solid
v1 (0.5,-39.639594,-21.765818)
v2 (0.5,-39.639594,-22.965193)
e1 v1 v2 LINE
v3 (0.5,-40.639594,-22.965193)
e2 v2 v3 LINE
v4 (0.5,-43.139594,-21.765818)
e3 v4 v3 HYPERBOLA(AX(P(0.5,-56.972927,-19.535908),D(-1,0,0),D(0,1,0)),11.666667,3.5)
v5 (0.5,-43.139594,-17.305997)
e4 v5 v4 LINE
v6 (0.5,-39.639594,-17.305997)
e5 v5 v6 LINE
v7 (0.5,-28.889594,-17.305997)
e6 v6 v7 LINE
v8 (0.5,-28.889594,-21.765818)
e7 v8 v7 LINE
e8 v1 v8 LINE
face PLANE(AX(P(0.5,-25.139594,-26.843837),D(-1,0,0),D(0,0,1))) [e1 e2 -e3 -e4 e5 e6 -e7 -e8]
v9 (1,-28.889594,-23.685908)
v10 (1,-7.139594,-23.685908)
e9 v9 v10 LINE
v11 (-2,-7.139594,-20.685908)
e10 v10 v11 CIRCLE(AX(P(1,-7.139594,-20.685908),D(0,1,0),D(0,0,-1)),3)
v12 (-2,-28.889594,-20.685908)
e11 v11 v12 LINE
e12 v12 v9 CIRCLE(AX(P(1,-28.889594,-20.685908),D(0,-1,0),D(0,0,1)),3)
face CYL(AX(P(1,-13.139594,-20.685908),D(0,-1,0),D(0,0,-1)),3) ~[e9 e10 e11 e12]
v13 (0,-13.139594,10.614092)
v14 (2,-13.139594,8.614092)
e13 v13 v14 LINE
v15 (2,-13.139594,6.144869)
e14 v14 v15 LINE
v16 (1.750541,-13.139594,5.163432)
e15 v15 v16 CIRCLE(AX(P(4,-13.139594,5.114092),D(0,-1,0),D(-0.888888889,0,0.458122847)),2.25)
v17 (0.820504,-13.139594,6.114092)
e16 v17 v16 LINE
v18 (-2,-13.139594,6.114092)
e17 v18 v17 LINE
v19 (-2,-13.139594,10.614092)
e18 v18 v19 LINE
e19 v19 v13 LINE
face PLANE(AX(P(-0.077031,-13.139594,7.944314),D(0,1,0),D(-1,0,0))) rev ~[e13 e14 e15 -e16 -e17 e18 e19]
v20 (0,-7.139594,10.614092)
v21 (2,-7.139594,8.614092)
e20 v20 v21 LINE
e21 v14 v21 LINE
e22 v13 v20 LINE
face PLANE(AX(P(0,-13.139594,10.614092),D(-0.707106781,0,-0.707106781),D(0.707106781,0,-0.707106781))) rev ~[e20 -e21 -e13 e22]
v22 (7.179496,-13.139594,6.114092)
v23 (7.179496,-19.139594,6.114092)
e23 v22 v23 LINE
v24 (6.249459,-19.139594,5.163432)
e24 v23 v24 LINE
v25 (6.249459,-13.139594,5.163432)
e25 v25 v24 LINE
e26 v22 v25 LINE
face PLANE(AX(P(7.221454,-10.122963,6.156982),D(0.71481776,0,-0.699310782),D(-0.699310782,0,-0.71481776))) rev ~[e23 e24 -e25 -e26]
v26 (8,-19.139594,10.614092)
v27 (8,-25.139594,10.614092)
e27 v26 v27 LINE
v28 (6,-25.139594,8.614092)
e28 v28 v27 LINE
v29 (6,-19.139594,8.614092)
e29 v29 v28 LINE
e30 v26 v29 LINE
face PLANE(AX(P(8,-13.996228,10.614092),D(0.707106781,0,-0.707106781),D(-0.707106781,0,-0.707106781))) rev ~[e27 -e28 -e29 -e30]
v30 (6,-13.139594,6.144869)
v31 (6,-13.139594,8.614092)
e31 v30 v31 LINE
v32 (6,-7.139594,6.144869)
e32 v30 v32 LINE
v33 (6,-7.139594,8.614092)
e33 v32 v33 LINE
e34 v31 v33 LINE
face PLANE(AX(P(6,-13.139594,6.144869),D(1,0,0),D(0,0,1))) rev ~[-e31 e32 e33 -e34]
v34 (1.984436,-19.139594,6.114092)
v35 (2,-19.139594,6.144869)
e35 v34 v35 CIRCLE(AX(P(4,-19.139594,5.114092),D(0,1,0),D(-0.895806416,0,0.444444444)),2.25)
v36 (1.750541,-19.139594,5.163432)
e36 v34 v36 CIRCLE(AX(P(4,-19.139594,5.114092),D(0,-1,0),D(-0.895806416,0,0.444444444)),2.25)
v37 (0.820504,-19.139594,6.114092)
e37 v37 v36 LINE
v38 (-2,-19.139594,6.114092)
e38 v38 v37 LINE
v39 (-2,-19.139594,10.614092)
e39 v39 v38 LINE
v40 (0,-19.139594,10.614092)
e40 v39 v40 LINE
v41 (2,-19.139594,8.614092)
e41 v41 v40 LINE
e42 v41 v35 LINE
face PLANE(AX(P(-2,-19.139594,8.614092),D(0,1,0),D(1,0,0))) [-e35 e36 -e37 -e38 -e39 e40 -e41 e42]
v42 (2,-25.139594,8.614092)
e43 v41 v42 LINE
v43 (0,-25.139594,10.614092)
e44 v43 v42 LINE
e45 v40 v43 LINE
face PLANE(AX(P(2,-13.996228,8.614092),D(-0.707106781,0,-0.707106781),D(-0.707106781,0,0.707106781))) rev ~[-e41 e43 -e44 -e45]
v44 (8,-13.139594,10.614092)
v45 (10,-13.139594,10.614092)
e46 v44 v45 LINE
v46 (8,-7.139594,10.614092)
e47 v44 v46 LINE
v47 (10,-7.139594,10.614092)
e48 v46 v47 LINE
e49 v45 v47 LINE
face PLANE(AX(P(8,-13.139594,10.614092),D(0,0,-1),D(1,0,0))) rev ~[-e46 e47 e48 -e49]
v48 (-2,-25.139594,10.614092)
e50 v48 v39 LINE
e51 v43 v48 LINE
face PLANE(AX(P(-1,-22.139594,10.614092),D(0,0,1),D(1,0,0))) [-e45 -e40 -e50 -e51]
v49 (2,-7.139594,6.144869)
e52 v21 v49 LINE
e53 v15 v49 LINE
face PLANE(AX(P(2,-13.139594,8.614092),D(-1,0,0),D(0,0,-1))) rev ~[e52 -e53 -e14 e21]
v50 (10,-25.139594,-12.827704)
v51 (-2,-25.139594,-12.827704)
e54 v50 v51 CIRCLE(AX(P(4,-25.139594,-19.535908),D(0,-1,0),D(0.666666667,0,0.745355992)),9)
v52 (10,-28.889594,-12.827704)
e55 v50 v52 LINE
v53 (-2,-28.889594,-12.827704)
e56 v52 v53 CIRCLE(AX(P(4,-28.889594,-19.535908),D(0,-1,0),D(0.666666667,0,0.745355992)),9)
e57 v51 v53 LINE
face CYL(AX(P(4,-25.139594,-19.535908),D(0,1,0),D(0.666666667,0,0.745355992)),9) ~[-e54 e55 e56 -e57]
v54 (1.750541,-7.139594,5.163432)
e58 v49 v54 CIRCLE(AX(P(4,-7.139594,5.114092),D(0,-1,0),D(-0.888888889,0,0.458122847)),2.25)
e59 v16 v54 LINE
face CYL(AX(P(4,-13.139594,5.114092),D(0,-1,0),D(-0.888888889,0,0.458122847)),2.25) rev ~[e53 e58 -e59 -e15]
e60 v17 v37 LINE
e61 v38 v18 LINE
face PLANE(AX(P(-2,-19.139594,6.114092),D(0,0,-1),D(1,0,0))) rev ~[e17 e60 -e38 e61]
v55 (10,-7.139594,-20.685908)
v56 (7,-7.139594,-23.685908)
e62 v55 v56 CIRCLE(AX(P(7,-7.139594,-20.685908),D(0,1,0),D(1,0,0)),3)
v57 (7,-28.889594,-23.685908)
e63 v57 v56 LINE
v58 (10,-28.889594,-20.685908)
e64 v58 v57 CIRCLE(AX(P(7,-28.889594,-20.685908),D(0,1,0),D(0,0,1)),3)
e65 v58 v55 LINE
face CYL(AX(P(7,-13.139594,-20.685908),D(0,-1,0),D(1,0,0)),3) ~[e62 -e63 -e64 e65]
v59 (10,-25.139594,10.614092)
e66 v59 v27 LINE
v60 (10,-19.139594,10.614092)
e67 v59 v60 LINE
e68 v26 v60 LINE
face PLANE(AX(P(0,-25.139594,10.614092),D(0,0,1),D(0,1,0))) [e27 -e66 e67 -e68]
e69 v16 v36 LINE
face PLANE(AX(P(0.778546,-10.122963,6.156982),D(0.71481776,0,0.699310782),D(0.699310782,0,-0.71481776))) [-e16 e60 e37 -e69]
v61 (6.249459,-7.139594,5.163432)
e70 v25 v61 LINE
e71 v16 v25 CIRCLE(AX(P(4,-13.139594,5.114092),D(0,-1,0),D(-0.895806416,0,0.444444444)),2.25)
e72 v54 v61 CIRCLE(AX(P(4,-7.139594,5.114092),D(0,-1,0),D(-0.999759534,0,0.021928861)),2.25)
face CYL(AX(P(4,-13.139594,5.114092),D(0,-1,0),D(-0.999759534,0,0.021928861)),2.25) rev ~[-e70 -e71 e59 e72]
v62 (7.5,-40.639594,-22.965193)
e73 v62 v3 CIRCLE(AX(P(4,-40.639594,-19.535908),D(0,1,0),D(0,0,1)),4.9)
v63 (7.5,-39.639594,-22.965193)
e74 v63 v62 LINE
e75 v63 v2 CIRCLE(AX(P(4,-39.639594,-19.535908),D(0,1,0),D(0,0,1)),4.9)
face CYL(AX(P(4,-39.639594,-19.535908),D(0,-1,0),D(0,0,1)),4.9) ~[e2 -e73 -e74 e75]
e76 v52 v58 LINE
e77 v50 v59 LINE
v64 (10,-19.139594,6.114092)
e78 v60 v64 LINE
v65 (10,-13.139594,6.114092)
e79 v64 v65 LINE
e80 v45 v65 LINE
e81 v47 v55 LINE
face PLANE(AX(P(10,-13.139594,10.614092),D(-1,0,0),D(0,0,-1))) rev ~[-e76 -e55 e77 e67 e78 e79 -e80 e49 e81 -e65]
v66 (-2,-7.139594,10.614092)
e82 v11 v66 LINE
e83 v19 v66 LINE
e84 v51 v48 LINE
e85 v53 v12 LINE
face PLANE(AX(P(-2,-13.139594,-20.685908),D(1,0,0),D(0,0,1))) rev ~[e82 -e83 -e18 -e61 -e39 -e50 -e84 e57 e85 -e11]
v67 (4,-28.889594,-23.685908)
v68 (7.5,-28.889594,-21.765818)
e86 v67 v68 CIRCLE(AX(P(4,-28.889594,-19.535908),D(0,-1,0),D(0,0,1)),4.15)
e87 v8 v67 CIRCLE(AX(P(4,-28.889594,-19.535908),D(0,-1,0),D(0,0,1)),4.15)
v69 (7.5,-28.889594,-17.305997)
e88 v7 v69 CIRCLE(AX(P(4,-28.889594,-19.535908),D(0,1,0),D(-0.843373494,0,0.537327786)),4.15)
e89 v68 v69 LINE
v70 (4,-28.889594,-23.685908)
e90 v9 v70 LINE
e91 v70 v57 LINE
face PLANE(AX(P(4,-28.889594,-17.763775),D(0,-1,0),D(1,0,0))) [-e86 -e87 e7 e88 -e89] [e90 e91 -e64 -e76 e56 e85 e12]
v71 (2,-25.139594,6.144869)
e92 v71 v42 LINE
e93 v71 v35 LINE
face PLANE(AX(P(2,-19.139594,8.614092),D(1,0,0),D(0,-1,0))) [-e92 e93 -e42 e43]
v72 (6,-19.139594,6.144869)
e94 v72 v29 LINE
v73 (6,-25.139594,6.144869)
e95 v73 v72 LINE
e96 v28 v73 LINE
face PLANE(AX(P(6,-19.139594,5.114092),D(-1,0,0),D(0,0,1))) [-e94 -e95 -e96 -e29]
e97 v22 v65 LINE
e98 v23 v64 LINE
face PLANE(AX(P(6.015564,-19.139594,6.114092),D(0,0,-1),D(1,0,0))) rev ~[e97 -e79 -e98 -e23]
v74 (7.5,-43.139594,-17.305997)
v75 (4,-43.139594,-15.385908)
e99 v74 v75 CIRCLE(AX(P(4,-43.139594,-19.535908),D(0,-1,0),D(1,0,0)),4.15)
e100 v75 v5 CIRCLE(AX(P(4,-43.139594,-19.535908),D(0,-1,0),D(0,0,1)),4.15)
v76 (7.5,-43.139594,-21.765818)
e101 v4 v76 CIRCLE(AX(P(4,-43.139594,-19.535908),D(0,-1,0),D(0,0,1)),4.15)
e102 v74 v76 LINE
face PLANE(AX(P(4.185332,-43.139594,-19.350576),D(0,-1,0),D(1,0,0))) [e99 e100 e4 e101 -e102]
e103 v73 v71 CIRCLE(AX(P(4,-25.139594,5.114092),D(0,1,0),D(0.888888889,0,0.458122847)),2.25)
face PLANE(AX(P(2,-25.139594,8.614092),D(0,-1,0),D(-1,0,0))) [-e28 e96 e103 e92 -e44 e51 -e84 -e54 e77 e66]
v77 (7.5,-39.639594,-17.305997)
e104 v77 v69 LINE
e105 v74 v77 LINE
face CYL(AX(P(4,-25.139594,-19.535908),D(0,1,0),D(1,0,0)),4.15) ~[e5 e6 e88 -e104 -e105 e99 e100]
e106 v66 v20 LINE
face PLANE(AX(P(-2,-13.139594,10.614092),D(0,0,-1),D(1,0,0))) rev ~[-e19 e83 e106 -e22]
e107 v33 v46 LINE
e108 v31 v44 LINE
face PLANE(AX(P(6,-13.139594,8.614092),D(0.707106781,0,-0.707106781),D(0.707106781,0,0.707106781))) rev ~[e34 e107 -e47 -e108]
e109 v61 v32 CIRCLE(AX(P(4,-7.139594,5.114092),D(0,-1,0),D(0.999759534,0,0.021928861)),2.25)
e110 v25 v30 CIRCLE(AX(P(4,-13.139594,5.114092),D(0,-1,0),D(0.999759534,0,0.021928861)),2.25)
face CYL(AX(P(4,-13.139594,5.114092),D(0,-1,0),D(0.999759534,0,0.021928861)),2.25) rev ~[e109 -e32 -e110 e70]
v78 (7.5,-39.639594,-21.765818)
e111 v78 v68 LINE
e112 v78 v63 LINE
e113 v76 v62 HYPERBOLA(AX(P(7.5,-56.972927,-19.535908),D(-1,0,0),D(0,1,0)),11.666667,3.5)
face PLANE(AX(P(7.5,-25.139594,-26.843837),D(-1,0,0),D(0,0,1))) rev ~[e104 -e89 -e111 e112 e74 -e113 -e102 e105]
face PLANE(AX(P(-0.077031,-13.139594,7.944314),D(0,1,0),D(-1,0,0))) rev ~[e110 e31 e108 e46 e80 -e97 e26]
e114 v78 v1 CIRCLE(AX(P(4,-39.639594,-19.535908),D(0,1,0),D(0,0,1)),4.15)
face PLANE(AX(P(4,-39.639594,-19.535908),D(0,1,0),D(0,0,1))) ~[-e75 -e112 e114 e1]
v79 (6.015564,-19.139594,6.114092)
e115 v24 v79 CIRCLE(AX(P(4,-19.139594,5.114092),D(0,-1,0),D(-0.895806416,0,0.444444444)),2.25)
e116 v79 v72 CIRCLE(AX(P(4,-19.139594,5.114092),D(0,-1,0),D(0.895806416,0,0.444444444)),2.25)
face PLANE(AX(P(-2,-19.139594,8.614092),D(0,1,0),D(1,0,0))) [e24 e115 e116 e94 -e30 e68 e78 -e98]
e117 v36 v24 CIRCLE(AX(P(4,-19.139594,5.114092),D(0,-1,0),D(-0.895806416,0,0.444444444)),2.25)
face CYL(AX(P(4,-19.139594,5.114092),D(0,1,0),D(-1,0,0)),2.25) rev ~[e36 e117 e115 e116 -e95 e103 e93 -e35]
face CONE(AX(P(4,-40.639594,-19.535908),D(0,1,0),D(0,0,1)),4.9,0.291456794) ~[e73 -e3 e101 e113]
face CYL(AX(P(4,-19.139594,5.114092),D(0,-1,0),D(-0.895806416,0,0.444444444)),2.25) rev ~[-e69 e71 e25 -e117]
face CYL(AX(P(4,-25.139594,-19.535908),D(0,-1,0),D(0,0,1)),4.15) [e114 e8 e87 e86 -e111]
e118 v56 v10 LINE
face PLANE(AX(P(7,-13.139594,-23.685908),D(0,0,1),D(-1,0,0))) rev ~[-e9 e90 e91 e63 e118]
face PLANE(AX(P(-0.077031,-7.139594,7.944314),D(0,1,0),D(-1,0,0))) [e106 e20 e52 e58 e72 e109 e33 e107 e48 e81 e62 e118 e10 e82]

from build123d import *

# Parameters (mm, degrees)
F0_W         = 6
F0_H         = 18
F1_DEPTH     = 8
F3_DEPTH     = 18
F4_DEPTH     = 6
F5_DEPTH     = 4.2
F10_DEPTH    = 6
F11_R        = 2.25
F13_DEPTH    = 25
F14_W        = 4
F14_H        = 4.5
F15_DEPTH    = 25
F16_W        = 2.5
F16_H        = 17.5837995484
F16_W_2      = 3.5
F17_DEPTH    = 18.001
F18_W        = 2
F18_H        = 6
F19_DEPTH    = 30
F21_DEPTH    = 6
F23_DEPTH    = 3.75
F24_R        = 3
F26_DEPTH    = 25
F27_DEPTH    = 2
F28_T1_DEPTH = 16.2867319519
F30_DEPTH    = 6
F31_T1_DEPTH = 9.0166310888
F33_DEPTH    = 6


# Not quite as in the source:
# - a fillet or chamfer that OpenCascade refuses, or shapes differently, is made with other operations: its cross-section is extruded or revolved along the edge and cut away or added


with BuildPart() as f1:
    # F0 (on Right) → F1 (new body)
    with BuildSketch(Plane.YZ):
        with Locations((-22.1395939865, -6.3859075308)):
            Rectangle(F0_W, F0_H)
    extrude(amount=F1_DEPTH)


with BuildPart() as f3:
    # F2 (on face) → F3 (new body)
    with BuildSketch(Plane.XZ.offset(25.1395939865)):
        with BuildLine():
            ThreePointArc((4, -15.3859075308), (1.0655068581, -22.4704006727), (8.15, -19.5359075308))
            ThreePointArc((8.15, -19.5359075308), (6.9344931419, -16.6014143889), (4, -15.3859075308))
        make_face()
    extrude(amount=F3_DEPTH)


with BuildPart() as f4:
    # F4 (new, through all): a face of the model
    f4_faces = [f3.part.faces().sort_by_distance(p)[0] for p in [
        (4, -25.1395939865, -19.5359075308),
    ]]
    extrude(f4_faces, amount=F4_DEPTH)


with BuildPart() as f5:
    # F5 (new): a face of the model
    f5_faces = [f1.part.faces().sort_by_distance(p)[0] for p in [
        (4, -22.1395939865, -15.3859075308),
    ]]
    extrude(f5_faces, amount=F5_DEPTH)


with BuildPart() as f3_1:
    add(f3.part)

    # F6: union F4, F5, F1
    add(f4.part)
    add(f5.part)
    add(f1.part)

    # F8 (on mid) → F9 (revolve)
    with BuildSketch(Plane.YZ.offset(4)):
        Polygon((-43.1395939865, -15.3859075308), (-39.6395939865, -15.3859075308), (-39.6395939865, -14.6359075308), (-40.6395939865, -14.6359075308), align=None)
    revolve(axis=Axis((4, -25.1395939865, -19.5359075308), (0, 1, 0)))


with BuildPart() as f10:
    # F10 (new): a face of the model
    f10_faces = [f3_1.part.faces().sort_by_distance(p)[0] for p in [
        (4, -22.1395939865, 2.6140924692),
    ]]
    extrude(f10_faces, amount=F10_DEPTH)

    # F12: union F3
    add(f3_1.part)

    # F11 (on face) → F13 (cut)
    with BuildSketch(Plane(origin=(0, -19.1395939865, 0), x_dir=(-1, 0, 0), z_dir=(0, 1, 0))):
        with Locations((-4, 5.1140924692)):
            Circle(F11_R)
    extrude(amount=-F13_DEPTH, mode=Mode.SUBTRACT)

    # F14 (on face) → F15 (cut)
    with BuildSketch(Plane(origin=(0, -19.1395939865, 0), x_dir=(-1, 0, 0), z_dir=(0, 1, 0))):
        with Locations((-4, 7.3640924692)):
            Rectangle(F14_W, F14_H)
    extrude(amount=-F15_DEPTH, mode=Mode.SUBTRACT)

    # F16 (on face) → F17 (cut, through all)
    with BuildSketch(Plane.XZ.offset(25.1395939865)):
        with Locations((-0.75, -18.0519367568)):
            Rectangle(F16_W, F16_H)
        with Locations((9.25, -18.0519367568)):
            Rectangle(F16_W_2, F16_H)
    extrude(amount=F17_DEPTH, mode=Mode.SUBTRACT)

    # F18 (on face) → F19 (join)
    with BuildSketch(Plane.XY.offset(8.6140924692)):
        with Locations((-1, -22.1395939865)):
            Rectangle(F18_W, F18_H)
        with Locations((9, -22.1395939865)):
            Rectangle(F18_W, F18_H)
    extrude(amount=-F19_DEPTH)

    # F20 (on face) → F21 (join, through all)
    with BuildSketch(Plane(origin=(0, -19.1395939865, 0), x_dir=(-1, 0, 0), z_dir=(0, 1, 0))):
        with BuildLine():
            Line((-8, -21.3859075308), (-10, -21.3859075308))
            Line((-10, -21.3859075308), (-10, -23.6859075308))
            Line((-10, -23.6859075308), (-4, -23.6859075308))
            ThreePointArc((-4, -23.6859075308), (-6.5133623932, -22.8382566159), (-8, -20.6415747502))
            Line((-8, -20.6415747502), (-8, -21.3859075308))
        make_face()
        with BuildLine():
            Line((2, -23.6859075308), (2, -21.3859075308))
            Line((2, -21.3859075308), (0, -21.3859075308))
            Line((0, -21.3859075308), (0, -20.6415747502))
            ThreePointArc((0, -20.6415747502), (-1.4866376068, -22.8382566159), (-4, -23.6859075308))
            Line((-4, -23.6859075308), (2, -23.6859075308))
        make_face()
        with BuildLine():
            Line((2, -13.6859075308), (-10, -13.6859075308))
            Line((-10, -13.6859075308), (-10, -21.3859075308))
            Line((-10, -21.3859075308), (-8, -21.3859075308))
            Line((-8, -21.3859075308), (-8, -20.6415747502))
            ThreePointArc((-8, -20.6415747502), (-6.5133623932, -22.8382566159), (-4, -23.6859075308))
            ThreePointArc((-4, -23.6859075308), (-1.4866376068, -22.8382566159), (0, -20.6415747502))
            Line((0, -20.6415747502), (0, -21.3859075308))
            Line((0, -21.3859075308), (2, -21.3859075308))
            Line((2, -21.3859075308), (2, -13.6859075308))
        make_face()
    extrude(amount=-F21_DEPTH)

    # F22 (on face) → F23 (join)
    with BuildSketch(Plane.XZ.offset(25.1395939865)):
        with BuildLine():
            Line((10, -23.6859075308), (10, -12.8277035983))
            ThreePointArc((10, -12.8277035983), (4, -10.5359075308), (-2, -12.8277035983))
            Line((-2, -12.8277035983), (-2, -23.6859075308))
            Line((-2, -23.6859075308), (10, -23.6859075308))
        make_face()
    extrude(amount=F23_DEPTH)

    # F24
    f24_edges = [f10.edges().sort_by_distance(p)[0] for p in [
        (-2, -24.014594, -23.685908),
        (10, -24.014594, -23.685908),
    ]]
    fillet(f24_edges, radius=F24_R)

    # F25 (on face) → F26 (cut)
    with BuildSketch(Plane.XZ.offset(28.8895939865)):
        with BuildLine():
            ThreePointArc((-0.15, -19.5359075308), (4, -15.3859075308), (8.15, -19.5359075308))
            Line((8.15, -19.5359075308), (10, -19.5359075308))
            Line((10, -19.5359075308), (10, -10.5359075308))
            Line((10, -10.5359075308), (-2, -10.5359075308))
            Line((-2, -10.5359075308), (-2, -19.5359075308))
            Line((-2, -19.5359075308), (-0.15, -19.5359075308))
        make_face()
    extrude(amount=F26_DEPTH, mode=Mode.SUBTRACT)

    # F27 (add): faces of the model
    f27_faces = [f10.faces().sort_by_distance(p)[0] for p in [
        (0, -22.1395939865, 8.6140924692),
        (8, -22.1395939865, 8.6140924692),
    ]]
    extrude(f27_faces, amount=F27_DEPTH)

    # F28: chamfer of 2 on 4 edges, made by hand

    # F28_s2 → F28_t1 (cut)
    with BuildSketch(Plane.XZ.offset(13.9962280105)):
        Polygon((8, 10.6140924692), (6, 8.6140924692), (6, 10.6140924692), align=None)
        Polygon((2, 8.6140924692), (0, 10.6140924692), (2, 10.6140924692), align=None)
    extrude(amount=F28_T1_DEPTH, mode=Mode.SUBTRACT)

    # F29 (on face) → F30 (join)
    with BuildSketch(Plane(origin=(0, -19.1395939865, 0), x_dir=(-1, 0, 0), z_dir=(0, 1, 0))):
        with BuildLine():
            Line((-6.0155644371, 6.1140924692), (-10, 6.1140924692))
            Line((-10, 6.1140924692), (-10, -20.6859075308))
            ThreePointArc((-10, -20.6859075308), (-9.1213203436, -22.8072278743), (-7, -23.6859075308))
            Line((-7, -23.6859075308), (-1, -23.6859075308))
            ThreePointArc((-1, -23.6859075308), (1.1213203436, -22.8072278743), (2, -20.6859075308))
            Line((2, -20.6859075308), (2, 6.1140924692))
            Line((2, 6.1140924692), (-1.9844355629, 6.1140924692))
            ThreePointArc((-1.9844355629, 6.1140924692), (-4, 2.8640924692), (-6.0155644371, 6.1140924692))
        make_face()
    extrude(amount=F30_DEPTH)

    # F31: chamfer of 1.5 on 2 edges, made by hand

    # F31_s2 → F31_t1 (cut)
    with BuildSketch(Plane.XZ.offset(10.1229628977)):
        with BuildLine():
            Line((7.2214544106, 6.1569815348), (6.2075003037, 5.1205433408))
            Line((6.2075003037, 5.1205433408), (6.1775075177, 5.119885475))
            ThreePointArc((6.1775075177, 5.119885475), (6.1595192188, 5.6287542453), (5.9886902446, 6.1007591359))
            Line((5.9886902446, 6.1007591359), (6.0155644371, 6.1440924692))
            ThreePointArc((6.0155644371, 6.1440924692), (6.6185094238, 6.1440924692), (7.2214544106, 6.1869815348))
            Line((7.2214544106, 6.1869815348), (7.2214544106, 6.1569815348))
        make_face()
        with BuildLine():
            Line((0.7785455894, 6.1569815348), (1.7924996963, 5.1205433408))
            Line((1.7924996963, 5.1205433408), (1.8224924823, 5.119885475))
            ThreePointArc((1.8224924823, 5.119885475), (1.8404807812, 5.6287542453), (2.0113097554, 6.1007591359))
            Line((2.0113097554, 6.1007591359), (1.9844355629, 6.1440924692))
            ThreePointArc((1.9844355629, 6.1440924692), (1.3814905762, 6.1440924692), (0.7785455894, 6.1869815348))
            Line((0.7785455894, 6.1869815348), (0.7785455894, 6.1569815348))
        make_face()
    extrude(amount=F31_T1_DEPTH, mode=Mode.SUBTRACT)

    # F32 (on face) → F33 (join)
    with BuildSketch(Plane(origin=(0, -13.1395939865, 0), x_dir=(-1, 0, 0), z_dir=(0, 1, 0))):
        with BuildLine():
            ThreePointArc((-2, 6.1448688756), (-1.8193396117, 5.668367014), (-1.7505410494, 5.1634324064))
            Line((-1.7505410494, 5.1634324064), (-0.8205042363, 6.1140924692))
            Line((-0.8205042363, 6.1140924692), (2, 6.1140924692))
            Line((2, 6.1140924692), (2, 10.6140924692))
            Line((2, 10.6140924692), (0, 10.6140924692))
            Line((0, 10.6140924692), (-2, 8.6140924692))
            Line((-2, 8.6140924692), (-2, 6.1448688756))
        make_face()
        with BuildLine():
            Line((-8, 10.6140924692), (-10, 10.6140924692))
            Line((-10, 10.6140924692), (-10, 6.1140924692))
            Line((-10, 6.1140924692), (-7.1794957637, 6.1140924692))
            Line((-7.1794957637, 6.1140924692), (-6.2494589506, 5.1634324064))
            ThreePointArc((-6.2494589506, 5.1634324064), (-6.1806603883, 5.668367014), (-6, 6.1448688756))
            Line((-6, 6.1448688756), (-6, 8.6140924692))
            Line((-6, 8.6140924692), (-8, 10.6140924692))
        make_face()
        with BuildLine():
            Line((-7.1794957637, 6.1140924692), (-10, 6.1140924692))
            Line((-10, 6.1140924692), (-10, -12.8277035983))
            Line((-10, -12.8277035983), (-10, -20.6859075308))
            ThreePointArc((-10, -20.6859075308), (-9.1213203436, -22.8072278743), (-7, -23.6859075308))
            Line((-7, -23.6859075308), (-1, -23.6859075308))
            ThreePointArc((-1, -23.6859075308), (1.1213203436, -22.8072278743), (2, -20.6859075308))
            Line((2, -20.6859075308), (2, -12.8277035983))
            Line((2, -12.8277035983), (2, 6.1140924692))
            Line((2, 6.1140924692), (-0.8205042363, 6.1140924692))
            Line((-0.8205042363, 6.1140924692), (-1.7505410494, 5.1634324064))
            ThreePointArc((-1.7505410494, 5.1634324064), (-4, 2.8640924692), (-6.2494589506, 5.1634324064))
            Line((-6.2494589506, 5.1634324064), (-7.1794957637, 6.1140924692))
        make_face()
    extrude(amount=F33_DEPTH)


solid = f10.part
